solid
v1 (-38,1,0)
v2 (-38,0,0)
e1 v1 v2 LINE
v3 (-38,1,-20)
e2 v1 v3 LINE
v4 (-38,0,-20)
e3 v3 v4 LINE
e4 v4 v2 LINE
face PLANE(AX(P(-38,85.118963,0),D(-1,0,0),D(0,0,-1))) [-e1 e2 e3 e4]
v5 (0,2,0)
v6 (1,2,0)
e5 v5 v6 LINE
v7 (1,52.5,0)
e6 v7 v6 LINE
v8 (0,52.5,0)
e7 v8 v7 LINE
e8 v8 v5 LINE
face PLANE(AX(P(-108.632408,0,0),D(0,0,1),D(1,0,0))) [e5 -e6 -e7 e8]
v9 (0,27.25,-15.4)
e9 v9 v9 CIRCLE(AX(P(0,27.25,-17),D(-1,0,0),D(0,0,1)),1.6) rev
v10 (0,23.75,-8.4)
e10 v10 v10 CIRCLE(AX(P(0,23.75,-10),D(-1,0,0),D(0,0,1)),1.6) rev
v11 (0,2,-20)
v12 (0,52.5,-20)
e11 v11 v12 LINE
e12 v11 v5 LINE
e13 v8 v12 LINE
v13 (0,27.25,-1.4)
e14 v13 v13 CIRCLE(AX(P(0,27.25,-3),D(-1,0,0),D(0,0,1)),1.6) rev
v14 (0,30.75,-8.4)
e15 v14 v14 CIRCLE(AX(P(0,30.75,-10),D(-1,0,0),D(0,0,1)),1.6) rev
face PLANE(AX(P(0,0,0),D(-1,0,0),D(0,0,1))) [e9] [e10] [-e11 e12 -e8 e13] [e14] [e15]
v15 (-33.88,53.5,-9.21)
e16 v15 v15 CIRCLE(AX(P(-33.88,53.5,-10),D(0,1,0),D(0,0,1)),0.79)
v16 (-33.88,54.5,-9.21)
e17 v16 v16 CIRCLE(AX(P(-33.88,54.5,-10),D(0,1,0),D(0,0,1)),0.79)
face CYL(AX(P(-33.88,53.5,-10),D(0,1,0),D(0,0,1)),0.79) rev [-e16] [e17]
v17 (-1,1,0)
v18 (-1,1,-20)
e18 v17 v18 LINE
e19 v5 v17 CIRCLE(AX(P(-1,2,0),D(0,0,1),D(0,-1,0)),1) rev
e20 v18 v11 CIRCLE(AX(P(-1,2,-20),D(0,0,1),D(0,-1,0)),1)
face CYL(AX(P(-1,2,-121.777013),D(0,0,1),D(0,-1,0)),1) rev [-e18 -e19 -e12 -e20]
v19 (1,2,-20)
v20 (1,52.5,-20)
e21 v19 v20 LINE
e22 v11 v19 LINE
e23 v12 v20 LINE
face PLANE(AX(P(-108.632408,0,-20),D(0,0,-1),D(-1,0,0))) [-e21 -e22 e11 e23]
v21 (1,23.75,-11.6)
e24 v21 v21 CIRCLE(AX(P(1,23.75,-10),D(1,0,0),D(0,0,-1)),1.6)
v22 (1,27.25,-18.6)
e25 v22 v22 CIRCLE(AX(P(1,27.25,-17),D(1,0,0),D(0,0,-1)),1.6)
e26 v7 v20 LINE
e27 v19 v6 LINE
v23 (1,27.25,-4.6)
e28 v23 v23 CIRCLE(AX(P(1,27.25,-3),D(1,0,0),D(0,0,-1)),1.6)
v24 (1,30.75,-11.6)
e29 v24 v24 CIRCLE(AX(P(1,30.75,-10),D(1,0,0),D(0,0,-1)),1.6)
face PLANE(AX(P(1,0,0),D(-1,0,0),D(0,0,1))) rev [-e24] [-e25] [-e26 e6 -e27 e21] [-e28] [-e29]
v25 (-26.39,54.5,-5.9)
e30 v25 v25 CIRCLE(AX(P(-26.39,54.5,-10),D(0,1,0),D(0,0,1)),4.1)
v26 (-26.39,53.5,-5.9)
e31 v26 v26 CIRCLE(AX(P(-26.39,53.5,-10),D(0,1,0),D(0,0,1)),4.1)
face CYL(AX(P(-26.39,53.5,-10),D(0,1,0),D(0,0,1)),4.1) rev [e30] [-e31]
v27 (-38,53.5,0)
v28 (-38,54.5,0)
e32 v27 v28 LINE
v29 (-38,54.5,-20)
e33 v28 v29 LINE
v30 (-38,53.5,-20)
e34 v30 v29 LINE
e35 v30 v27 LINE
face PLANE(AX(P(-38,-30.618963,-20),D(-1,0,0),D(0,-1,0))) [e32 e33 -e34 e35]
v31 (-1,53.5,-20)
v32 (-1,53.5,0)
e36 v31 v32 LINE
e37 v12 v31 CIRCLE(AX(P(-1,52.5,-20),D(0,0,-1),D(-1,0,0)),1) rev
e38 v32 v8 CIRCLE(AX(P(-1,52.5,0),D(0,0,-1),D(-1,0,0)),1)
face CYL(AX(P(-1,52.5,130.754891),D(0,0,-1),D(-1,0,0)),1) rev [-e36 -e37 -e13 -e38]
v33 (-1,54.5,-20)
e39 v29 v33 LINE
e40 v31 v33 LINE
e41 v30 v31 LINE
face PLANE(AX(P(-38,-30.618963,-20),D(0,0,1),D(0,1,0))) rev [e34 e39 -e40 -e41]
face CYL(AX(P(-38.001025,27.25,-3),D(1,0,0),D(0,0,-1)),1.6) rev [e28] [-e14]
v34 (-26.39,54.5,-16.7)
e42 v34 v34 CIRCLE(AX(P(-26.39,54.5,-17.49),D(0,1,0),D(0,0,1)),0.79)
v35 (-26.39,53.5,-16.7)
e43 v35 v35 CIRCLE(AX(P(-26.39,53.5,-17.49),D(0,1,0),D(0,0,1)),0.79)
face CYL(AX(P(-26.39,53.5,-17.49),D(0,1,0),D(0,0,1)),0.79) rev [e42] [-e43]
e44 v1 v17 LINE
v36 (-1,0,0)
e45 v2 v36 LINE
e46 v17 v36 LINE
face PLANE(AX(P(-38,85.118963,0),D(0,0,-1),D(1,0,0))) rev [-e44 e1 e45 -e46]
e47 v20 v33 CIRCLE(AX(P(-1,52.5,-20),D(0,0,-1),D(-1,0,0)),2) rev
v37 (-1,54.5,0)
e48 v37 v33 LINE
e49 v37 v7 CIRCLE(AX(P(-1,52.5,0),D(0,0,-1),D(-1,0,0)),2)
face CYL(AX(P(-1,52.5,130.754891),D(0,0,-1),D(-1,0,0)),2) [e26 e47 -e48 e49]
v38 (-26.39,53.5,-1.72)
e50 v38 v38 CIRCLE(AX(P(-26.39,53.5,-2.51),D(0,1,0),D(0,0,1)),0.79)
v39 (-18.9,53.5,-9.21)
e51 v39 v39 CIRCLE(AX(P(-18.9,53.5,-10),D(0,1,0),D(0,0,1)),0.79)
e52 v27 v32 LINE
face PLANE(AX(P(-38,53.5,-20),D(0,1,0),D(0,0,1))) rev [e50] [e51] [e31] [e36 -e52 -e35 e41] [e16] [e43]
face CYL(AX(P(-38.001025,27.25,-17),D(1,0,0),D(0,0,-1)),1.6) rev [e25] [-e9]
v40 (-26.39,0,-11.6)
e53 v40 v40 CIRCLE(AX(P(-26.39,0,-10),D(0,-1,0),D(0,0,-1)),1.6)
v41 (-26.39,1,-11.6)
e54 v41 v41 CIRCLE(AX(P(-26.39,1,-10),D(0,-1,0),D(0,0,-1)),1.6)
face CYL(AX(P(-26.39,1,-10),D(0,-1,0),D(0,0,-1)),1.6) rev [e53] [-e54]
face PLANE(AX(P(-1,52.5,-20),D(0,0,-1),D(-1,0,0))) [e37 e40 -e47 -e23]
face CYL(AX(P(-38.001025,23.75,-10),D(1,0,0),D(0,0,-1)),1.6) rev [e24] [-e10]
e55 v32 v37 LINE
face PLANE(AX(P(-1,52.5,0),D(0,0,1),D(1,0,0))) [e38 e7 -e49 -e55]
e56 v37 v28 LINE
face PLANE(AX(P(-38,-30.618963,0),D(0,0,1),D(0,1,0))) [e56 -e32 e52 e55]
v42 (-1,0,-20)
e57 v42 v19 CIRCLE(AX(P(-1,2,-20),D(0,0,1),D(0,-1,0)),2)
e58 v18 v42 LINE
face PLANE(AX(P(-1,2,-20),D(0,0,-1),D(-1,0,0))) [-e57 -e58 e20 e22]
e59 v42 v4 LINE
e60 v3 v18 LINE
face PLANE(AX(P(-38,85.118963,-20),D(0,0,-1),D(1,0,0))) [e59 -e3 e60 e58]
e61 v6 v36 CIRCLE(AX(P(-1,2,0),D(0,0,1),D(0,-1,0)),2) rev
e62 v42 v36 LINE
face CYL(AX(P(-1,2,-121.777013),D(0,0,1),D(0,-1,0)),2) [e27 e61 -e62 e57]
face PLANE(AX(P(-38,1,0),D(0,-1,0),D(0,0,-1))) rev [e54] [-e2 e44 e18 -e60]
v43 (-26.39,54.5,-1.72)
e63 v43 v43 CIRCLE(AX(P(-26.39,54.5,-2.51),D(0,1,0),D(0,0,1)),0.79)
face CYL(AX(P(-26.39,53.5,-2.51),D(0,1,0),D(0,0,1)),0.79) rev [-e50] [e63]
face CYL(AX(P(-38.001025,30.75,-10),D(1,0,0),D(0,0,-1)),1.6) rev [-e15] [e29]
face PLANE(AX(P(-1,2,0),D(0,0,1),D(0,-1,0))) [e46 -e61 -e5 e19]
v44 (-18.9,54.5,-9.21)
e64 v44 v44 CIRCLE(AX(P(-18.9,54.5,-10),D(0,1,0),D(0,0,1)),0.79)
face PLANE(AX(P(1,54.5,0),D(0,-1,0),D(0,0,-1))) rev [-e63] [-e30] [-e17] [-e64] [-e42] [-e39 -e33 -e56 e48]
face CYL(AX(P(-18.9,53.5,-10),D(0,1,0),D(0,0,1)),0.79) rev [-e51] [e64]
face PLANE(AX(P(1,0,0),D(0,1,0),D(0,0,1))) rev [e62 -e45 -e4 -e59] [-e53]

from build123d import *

# Parameters (mm, degrees)
SKETCH_1_W                    = 20
SKETCH_1_H                    = 54.5
EXTRUDE_1_DEPTH               = 1
SKETCH_2_W                    = 20
SKETCH_2_H                    = 1
EXTRUDE_2_DEPTH               = 38
SKETCH_3_W                    = 20
SKETCH_3_H                    = 1
EXTRUDE_3_DEPTH               = 38
SKETCH_4_R                    = 4.1
CUT_EXTRUDE_1_DEPTH           = 1
SKETCH_5_R                    = 0.79
CUT_EXTRUDE_2_DEPTH           = 1
SKETCH_6_R                    = 0.79
CUT_EXTRUDE_3_DEPTH           = 1
SKETCH_7_R                    = 0.79
CUT_EXTRUDE_4_DEPTH           = 1
SKETCH_8_R                    = 0.79
CUT_EXTRUDE_5_DEPTH           = 1
SKETCH_9_R                    = 1.6
CUT_EXTRUDE_6_DEPTH           = 1
CUT_EXTRUDE_7_REACH           = 71.937
SKETCH_10_R                   = 1.6
CUT_EXTRUDE_8_REACH           = 71.937
SKETCH_11_R                   = 1.6
CUT_EXTRUDE_9_REACH           = 71.937
SKETCH_12_R                   = 1.6
CUT_EXTRUDE_10_REACH          = 71.937
SKETCH_14_R                   = 1.6
SHEET_START                   = -38
SHEET_METAL_1_OUTLINE_W       = 1
SHEET_METAL_1_OUTLINE_H       = 20
SHEET_METAL_1_DEPTH           = 38
SHEET_METAL_1_2_OUTLINE_W     = 37.35619449
SHEET_METAL_1_2_OUTLINE_H     = 20
SHEET_METAL_1_2_OUTLINE_R     = 0.79
SHEET_METAL_1_2_OUTLINE_R_2   = 4.1
SHEET_METAL_1_2_OUTLINE_R_3   = 1.6
SHEET_METAL_1_2_DEPTH         = 1
SHEET_START_2                 = 54.28876
SHEET_METAL_1_3_OUTLINE_W     = 1
SHEET_METAL_1_3_OUTLINE_H     = 20
SHEET_METAL_1_3_DEPTH         = 37.56743449
SHEET_START_3                 = -37.35619449
SHEET_METAL_1_3_2_OUTLINE_W   = 1
SHEET_METAL_1_3_2_OUTLINE_H   = 20
SHEET_METAL_1_3_2_DEPTH       = 37.55071449
SHEET_METAL_1_3_3_OUTLINE_R   = 4.1
SHEET_METAL_1_3_3_OUTLINE_R_2 = 1.6
SHEET_METAL_1_3_3_OUTLINE_R_3 = 0.79
SHEET_METAL_1_3_3_DEPTH       = 1
SHEET_METAL_1_3_4_OUTLINE_W   = 38
SHEET_METAL_1_3_4_OUTLINE_H   = 20
SHEET_METAL_1_3_4_OUTLINE_R   = 0.79
SHEET_METAL_1_3_4_OUTLINE_R_2 = 4.1
SHEET_METAL_1_3_4_DEPTH       = 2
SHEET_START_4                 = 52.5
SHEET_METAL_1_3_5_OUTLINE_W   = 38
SHEET_METAL_1_3_5_OUTLINE_H   = 20
SHEET_METAL_1_3_5_OUTLINE_R   = 0.79
SHEET_METAL_1_3_5_OUTLINE_R_2 = 4.1
SHEET_METAL_1_3_5_DEPTH       = 2
SHEET_START_5                 = -20
SHEET_METAL_1_3_6_DEPTH       = 20


with BuildPart() as part:
    # Sketch 1 → ﾎﾞｽ - 押し出し1 (new body)
    with BuildSketch(Plane(origin=(0, 0, 0), x_dir=(0, 0, -1), z_dir=(1, 0, 0))):
        with Locations((10, 27.25)):
            Rectangle(SKETCH_1_W, SKETCH_1_H)
    extrude(amount=EXTRUDE_1_DEPTH)

    # Sketch 2 → ﾎﾞｽ - 押し出し2 (add)
    with BuildSketch(Plane.ZY):
        with Locations((-10, 54)):
            Rectangle(SKETCH_2_W, SKETCH_2_H)
    extrude(amount=EXTRUDE_2_DEPTH)

    # ｽｹｯﾁ3 → ﾎﾞｽ - 押し出し3 (add)
    with BuildSketch(Plane.ZY):
        with Locations((-10, 0.5)):
            Rectangle(SKETCH_3_W, SKETCH_3_H)
    extrude(amount=EXTRUDE_3_DEPTH)

    # ｽｹｯﾁ4 → ｶｯﾄ - 押し出し1 (cut)
    with BuildSketch(Plane(origin=(0, 54.5, 0), x_dir=(1, 0, 0), z_dir=(0, 1, 0))):
        with Locations(Location((-26.39, 10, 0), (0, 0, 270))):
            Circle(SKETCH_4_R)
    extrude(amount=-CUT_EXTRUDE_1_DEPTH, mode=Mode.SUBTRACT)

    # ｽｹｯﾁ5 → ｶｯﾄ - 押し出し2 (cut)
    with BuildSketch(Plane(origin=(0, 54.5, 0), x_dir=(1, 0, 0), z_dir=(0, 1, 0))):
        with Locations(Location((-33.88, 10, 0), (0, 0, 270))):
            Circle(SKETCH_5_R)
    extrude(amount=-CUT_EXTRUDE_2_DEPTH, mode=Mode.SUBTRACT)

    # ｽｹｯﾁ6 → ｶｯﾄ - 押し出し3 (cut)
    with BuildSketch(Plane(origin=(0, 54.5, 0), x_dir=(1, 0, 0), z_dir=(0, 1, 0))):
        with Locations(Location((-18.9, 10, 0), (0, 0, 270))):
            Circle(SKETCH_6_R)
    extrude(amount=-CUT_EXTRUDE_3_DEPTH, mode=Mode.SUBTRACT)

    # ｽｹｯﾁ7 → ｶｯﾄ - 押し出し4 (cut)
    with BuildSketch(Plane(origin=(0, 54.5, 0), x_dir=(1, 0, 0), z_dir=(0, 1, 0))):
        with Locations(Location((-26.39, 2.51, 0), (0, 0, 270))):
            Circle(SKETCH_7_R)
    extrude(amount=-CUT_EXTRUDE_4_DEPTH, mode=Mode.SUBTRACT)

    # ｽｹｯﾁ8 → ｶｯﾄ - 押し出し5 (cut)
    with BuildSketch(Plane(origin=(0, 54.5, 0), x_dir=(1, 0, 0), z_dir=(0, 1, 0))):
        with Locations(Location((-26.39, 17.49, 0), (0, 0, 270))):
            Circle(SKETCH_8_R)
    extrude(amount=-CUT_EXTRUDE_5_DEPTH, mode=Mode.SUBTRACT)

    # ｽｹｯﾁ9 → ｶｯﾄ - 押し出し6 (cut)
    with BuildSketch(Plane(origin=(0, 0, 0), x_dir=(-1, 0, 0), z_dir=(0, -1, 0))):
        with Locations(Location((26.39, 10, 0), (0, 0, 90))):
            Circle(SKETCH_9_R)
    extrude(amount=-CUT_EXTRUDE_6_DEPTH, mode=Mode.SUBTRACT)

    # ｽｹｯﾁ10 → ｶｯﾄ - 押し出し7 (cut, up to next)
    with BuildSketch(Plane(origin=(1, 0, 0), x_dir=(0, 0, -1), z_dir=(1, 0, 0)), mode=Mode.PRIVATE) as cut_extrude_7_sk1:
        with Locations((17, 27.25)):
            Circle(SKETCH_10_R)
    cut_extrude_7_tool1 = extrude(cut_extrude_7_sk1.sketch, amount=-CUT_EXTRUDE_7_REACH, mode=Mode.PRIVATE) & part.part
    add(cut_extrude_7_tool1.solids().sort_by_distance((1, 27.25, -17))[0], mode=Mode.SUBTRACT)

    # ｽｹｯﾁ11 → ｶｯﾄ - 押し出し8 (cut, up to next)
    with BuildSketch(Plane(origin=(1, 0, 0), x_dir=(0, 0, -1), z_dir=(1, 0, 0)), mode=Mode.PRIVATE) as cut_extrude_8_sk1:
        with Locations((3, 27.25)):
            Circle(SKETCH_11_R)
    cut_extrude_8_tool1 = extrude(cut_extrude_8_sk1.sketch, amount=-CUT_EXTRUDE_8_REACH, mode=Mode.PRIVATE) & part.part
    add(cut_extrude_8_tool1.solids().sort_by_distance((1, 27.25, -3))[0], mode=Mode.SUBTRACT)

    # ｽｹｯﾁ12 → ｶｯﾄ - 押し出し9 (cut, up to next)
    with BuildSketch(Plane(origin=(1, 0, 0), x_dir=(0, 0, -1), z_dir=(1, 0, 0)), mode=Mode.PRIVATE) as cut_extrude_9_sk1:
        with Locations((10, 23.75)):
            Circle(SKETCH_12_R)
    cut_extrude_9_tool1 = extrude(cut_extrude_9_sk1.sketch, amount=-CUT_EXTRUDE_9_REACH, mode=Mode.PRIVATE) & part.part
    add(cut_extrude_9_tool1.solids().sort_by_distance((1, 23.75, -10))[0], mode=Mode.SUBTRACT)

    # ｽｹｯﾁ14 → ｶｯﾄ - 押し出し10 (cut, up to next)
    with BuildSketch(Plane(origin=(1, 0, 0), x_dir=(0, 0, -1), z_dir=(1, 0, 0)), mode=Mode.PRIVATE) as cut_extrude_10_sk1:
        with Locations((10, 30.75)):
            Circle(SKETCH_14_R)
    cut_extrude_10_tool1 = extrude(cut_extrude_10_sk1.sketch, amount=-CUT_EXTRUDE_10_REACH, mode=Mode.PRIVATE) & part.part
    add(cut_extrude_10_tool1.solids().sort_by_distance((1, 30.75, -10))[0], mode=Mode.SUBTRACT)

    # Sheet Metal 1: read off the stored shape, not the designer's step
    # Sheet Metal 1 outline → Sheet Metal 1 (cut)
    with BuildSketch(Plane.YZ.offset(SHEET_START)):
        with Locations((54, -10)):
            Rectangle(SHEET_METAL_1_OUTLINE_W, SHEET_METAL_1_OUTLINE_H)
        with Locations((0.5, -10)):
            Rectangle(SHEET_METAL_1_OUTLINE_W, SHEET_METAL_1_OUTLINE_H)
    extrude(amount=SHEET_METAL_1_DEPTH, mode=Mode.SUBTRACT)

    # Sheet Metal 1 2 outline → Sheet Metal 1 2 (add)
    # profile 1 of 2: a face of its own
    with BuildSketch(Plane.YZ):
        with Locations((73.178097245, -10)):
            Rectangle(SHEET_METAL_1_2_OUTLINE_W, SHEET_METAL_1_2_OUTLINE_H)
        with Locations((80.24619449, -17.49)):
            Circle(SHEET_METAL_1_2_OUTLINE_R, mode=Mode.SUBTRACT)
        with Locations((72.75619449, -10)):
            Circle(SHEET_METAL_1_2_OUTLINE_R, mode=Mode.SUBTRACT)
        with Locations((80.24619449, -10)):
            Circle(SHEET_METAL_1_2_OUTLINE_R_2, mode=Mode.SUBTRACT)
        with Locations((87.73619449, -10)):
            Circle(SHEET_METAL_1_2_OUTLINE_R, mode=Mode.SUBTRACT)
        with Locations((80.24619449, -2.51)):
            Circle(SHEET_METAL_1_2_OUTLINE_R, mode=Mode.SUBTRACT)
    # profile 2 of 2: a face of its own
    with BuildSketch(Plane.YZ):
        with Locations((-18.678097245, -10)):
            Rectangle(SHEET_METAL_1_2_OUTLINE_W, SHEET_METAL_1_2_OUTLINE_H)
        with Locations((-25.74619449, -10)):
            Circle(SHEET_METAL_1_2_OUTLINE_R_3, mode=Mode.SUBTRACT)
    extrude(amount=SHEET_METAL_1_2_DEPTH)

    # Sheet Metal 1 3: read off the stored shape, not the designer's step
    # Sheet Metal 1 3 outline → Sheet Metal 1 3 (cut)
    with BuildSketch(Plane(origin=(0, 0, 0), x_dir=(1, 0, 0), z_dir=(0, 1, 0)).offset(SHEET_START_2)):
        with Locations((0.5, 10)):
            Rectangle(SHEET_METAL_1_3_OUTLINE_W, SHEET_METAL_1_3_OUTLINE_H)
    extrude(amount=SHEET_METAL_1_3_DEPTH, mode=Mode.SUBTRACT)

    # Sheet Metal 1 3 2 outline → Sheet Metal 1 3 2 (cut)
    with BuildSketch(Plane(origin=(0, 0, 0), x_dir=(1, 0, 0), z_dir=(0, 1, 0)).offset(SHEET_START_3)):
        with Locations((0.5, 10)):
            Rectangle(SHEET_METAL_1_3_2_OUTLINE_W, SHEET_METAL_1_3_2_OUTLINE_H)
    extrude(amount=SHEET_METAL_1_3_2_DEPTH, mode=Mode.SUBTRACT)



with BuildPart() as body_2:
    # Sheet Metal 1 3 3 outline → Sheet Metal 1 3 3 (new body)
    # profile 1 of 5: a face of its own
    with BuildSketch(Plane(origin=(0, 0, 0), x_dir=(1, 0, 0), z_dir=(0, 1, 0))):
        with Locations((-26.39, 10)):
            Circle(SHEET_METAL_1_3_3_OUTLINE_R)
        with Locations((-26.39, 10)):
            Circle(SHEET_METAL_1_3_3_OUTLINE_R_2, mode=Mode.SUBTRACT)
    # profile 2 of 5: a face of its own
    with BuildSketch(Plane(origin=(0, 0, 0), x_dir=(1, 0, 0), z_dir=(0, 1, 0))):
        with Locations((-33.88, 10)):
            Circle(SHEET_METAL_1_3_3_OUTLINE_R_3)
    # profile 3 of 5: a face of its own
    with BuildSketch(Plane(origin=(0, 0, 0), x_dir=(1, 0, 0), z_dir=(0, 1, 0))):
        with Locations((-18.9, 10)):
            Circle(SHEET_METAL_1_3_3_OUTLINE_R_3)
    # profile 4 of 5: a face of its own
    with BuildSketch(Plane(origin=(0, 0, 0), x_dir=(1, 0, 0), z_dir=(0, 1, 0))):
        with Locations((-26.39, 2.51)):
            Circle(SHEET_METAL_1_3_3_OUTLINE_R_3)
    # profile 5 of 5: a face of its own
    with BuildSketch(Plane(origin=(0, 0, 0), x_dir=(1, 0, 0), z_dir=(0, 1, 0))):
        with Locations((-26.39, 17.49)):
            Circle(SHEET_METAL_1_3_3_OUTLINE_R_3)
    extrude(amount=SHEET_METAL_1_3_3_DEPTH)


with BuildPart() as part_1:
    add(part.part)

    add(body_2.part)  # Sheet Metal 1 3 4 merges body 2
    # Sheet Metal 1 3 4 outline → Sheet Metal 1 3 4 (add)
    with BuildSketch(Plane(origin=(0, 0, 0), x_dir=(1, 0, 0), z_dir=(0, 1, 0))):
        with Locations((-19, 10)):
            Rectangle(SHEET_METAL_1_3_4_OUTLINE_W, SHEET_METAL_1_3_4_OUTLINE_H)
        with Locations((-26.39, 2.51)):
            Circle(SHEET_METAL_1_3_4_OUTLINE_R, mode=Mode.SUBTRACT)
        with Locations((-33.88, 10)):
            Circle(SHEET_METAL_1_3_4_OUTLINE_R, mode=Mode.SUBTRACT)
        with Locations((-26.39, 10)):
            Circle(SHEET_METAL_1_3_4_OUTLINE_R_2, mode=Mode.SUBTRACT)
        with Locations((-18.9, 10)):
            Circle(SHEET_METAL_1_3_4_OUTLINE_R, mode=Mode.SUBTRACT)
        with Locations((-26.39, 17.49)):
            Circle(SHEET_METAL_1_3_4_OUTLINE_R, mode=Mode.SUBTRACT)
    extrude(amount=SHEET_METAL_1_3_4_DEPTH)

    # Sheet Metal 1 3 5 outline → Sheet Metal 1 3 5 (add)
    with BuildSketch(Plane(origin=(0, 0, 0), x_dir=(1, 0, 0), z_dir=(0, 1, 0)).offset(SHEET_START_4)):
        with Locations((-19, 10)):
            Rectangle(SHEET_METAL_1_3_5_OUTLINE_W, SHEET_METAL_1_3_5_OUTLINE_H)
        with Locations((-26.39, 2.51)):
            Circle(SHEET_METAL_1_3_5_OUTLINE_R, mode=Mode.SUBTRACT)
        with Locations((-33.88, 10)):
            Circle(SHEET_METAL_1_3_5_OUTLINE_R, mode=Mode.SUBTRACT)
        with Locations((-26.39, 10)):
            Circle(SHEET_METAL_1_3_5_OUTLINE_R_2, mode=Mode.SUBTRACT)
        with Locations((-18.9, 10)):
            Circle(SHEET_METAL_1_3_5_OUTLINE_R, mode=Mode.SUBTRACT)
        with Locations((-26.39, 17.49)):
            Circle(SHEET_METAL_1_3_5_OUTLINE_R, mode=Mode.SUBTRACT)
    extrude(amount=SHEET_METAL_1_3_5_DEPTH)

    # Sheet Metal 1 3 6 outline → Sheet Metal 1 3 6 (cut)
    with BuildSketch(Plane.XY.offset(SHEET_START_5)):
        with BuildLine():
            Line((-38, 2), (-38, 1))
            Line((-38, 1), (-1, 1))
            ThreePointArc((-1, 1), (-0.292893219, 1.292893219), (0, 2))
            Line((0, 2), (-38, 2))
        make_face()
        with BuildLine():
            Line((-1, 53.5), (-38, 53.5))
            Line((-38, 53.5), (-38, 52.5))
            Line((-38, 52.5), (0, 52.5))
            ThreePointArc((0, 52.5), (-0.292893219, 53.207106781), (-1, 53.5))
        make_face()
        with BuildLine():
            ThreePointArc((-1, 54.5), (0.414213562, 53.914213562), (1, 52.5))
            Line((1, 52.5), (1, 54.28876))
            Line((1, 54.28876), (0, 54.28876))
            Line((0, 54.28876), (0, 54.5))
            Line((0, 54.5), (-1, 54.5))
        make_face()
        with BuildLine():
            ThreePointArc((1, 2), (0.414213562, 0.585786438), (-1, 0))
            Line((-1, 0), (0, 0))
            Line((0, 0), (0, 0.19452))
            Line((0, 0.19452), (1, 0.19452))
            Line((1, 0.19452), (1, 2))
        make_face()
    extrude(amount=SHEET_METAL_1_3_6_DEPTH, mode=Mode.SUBTRACT)


solid = part_1.part
